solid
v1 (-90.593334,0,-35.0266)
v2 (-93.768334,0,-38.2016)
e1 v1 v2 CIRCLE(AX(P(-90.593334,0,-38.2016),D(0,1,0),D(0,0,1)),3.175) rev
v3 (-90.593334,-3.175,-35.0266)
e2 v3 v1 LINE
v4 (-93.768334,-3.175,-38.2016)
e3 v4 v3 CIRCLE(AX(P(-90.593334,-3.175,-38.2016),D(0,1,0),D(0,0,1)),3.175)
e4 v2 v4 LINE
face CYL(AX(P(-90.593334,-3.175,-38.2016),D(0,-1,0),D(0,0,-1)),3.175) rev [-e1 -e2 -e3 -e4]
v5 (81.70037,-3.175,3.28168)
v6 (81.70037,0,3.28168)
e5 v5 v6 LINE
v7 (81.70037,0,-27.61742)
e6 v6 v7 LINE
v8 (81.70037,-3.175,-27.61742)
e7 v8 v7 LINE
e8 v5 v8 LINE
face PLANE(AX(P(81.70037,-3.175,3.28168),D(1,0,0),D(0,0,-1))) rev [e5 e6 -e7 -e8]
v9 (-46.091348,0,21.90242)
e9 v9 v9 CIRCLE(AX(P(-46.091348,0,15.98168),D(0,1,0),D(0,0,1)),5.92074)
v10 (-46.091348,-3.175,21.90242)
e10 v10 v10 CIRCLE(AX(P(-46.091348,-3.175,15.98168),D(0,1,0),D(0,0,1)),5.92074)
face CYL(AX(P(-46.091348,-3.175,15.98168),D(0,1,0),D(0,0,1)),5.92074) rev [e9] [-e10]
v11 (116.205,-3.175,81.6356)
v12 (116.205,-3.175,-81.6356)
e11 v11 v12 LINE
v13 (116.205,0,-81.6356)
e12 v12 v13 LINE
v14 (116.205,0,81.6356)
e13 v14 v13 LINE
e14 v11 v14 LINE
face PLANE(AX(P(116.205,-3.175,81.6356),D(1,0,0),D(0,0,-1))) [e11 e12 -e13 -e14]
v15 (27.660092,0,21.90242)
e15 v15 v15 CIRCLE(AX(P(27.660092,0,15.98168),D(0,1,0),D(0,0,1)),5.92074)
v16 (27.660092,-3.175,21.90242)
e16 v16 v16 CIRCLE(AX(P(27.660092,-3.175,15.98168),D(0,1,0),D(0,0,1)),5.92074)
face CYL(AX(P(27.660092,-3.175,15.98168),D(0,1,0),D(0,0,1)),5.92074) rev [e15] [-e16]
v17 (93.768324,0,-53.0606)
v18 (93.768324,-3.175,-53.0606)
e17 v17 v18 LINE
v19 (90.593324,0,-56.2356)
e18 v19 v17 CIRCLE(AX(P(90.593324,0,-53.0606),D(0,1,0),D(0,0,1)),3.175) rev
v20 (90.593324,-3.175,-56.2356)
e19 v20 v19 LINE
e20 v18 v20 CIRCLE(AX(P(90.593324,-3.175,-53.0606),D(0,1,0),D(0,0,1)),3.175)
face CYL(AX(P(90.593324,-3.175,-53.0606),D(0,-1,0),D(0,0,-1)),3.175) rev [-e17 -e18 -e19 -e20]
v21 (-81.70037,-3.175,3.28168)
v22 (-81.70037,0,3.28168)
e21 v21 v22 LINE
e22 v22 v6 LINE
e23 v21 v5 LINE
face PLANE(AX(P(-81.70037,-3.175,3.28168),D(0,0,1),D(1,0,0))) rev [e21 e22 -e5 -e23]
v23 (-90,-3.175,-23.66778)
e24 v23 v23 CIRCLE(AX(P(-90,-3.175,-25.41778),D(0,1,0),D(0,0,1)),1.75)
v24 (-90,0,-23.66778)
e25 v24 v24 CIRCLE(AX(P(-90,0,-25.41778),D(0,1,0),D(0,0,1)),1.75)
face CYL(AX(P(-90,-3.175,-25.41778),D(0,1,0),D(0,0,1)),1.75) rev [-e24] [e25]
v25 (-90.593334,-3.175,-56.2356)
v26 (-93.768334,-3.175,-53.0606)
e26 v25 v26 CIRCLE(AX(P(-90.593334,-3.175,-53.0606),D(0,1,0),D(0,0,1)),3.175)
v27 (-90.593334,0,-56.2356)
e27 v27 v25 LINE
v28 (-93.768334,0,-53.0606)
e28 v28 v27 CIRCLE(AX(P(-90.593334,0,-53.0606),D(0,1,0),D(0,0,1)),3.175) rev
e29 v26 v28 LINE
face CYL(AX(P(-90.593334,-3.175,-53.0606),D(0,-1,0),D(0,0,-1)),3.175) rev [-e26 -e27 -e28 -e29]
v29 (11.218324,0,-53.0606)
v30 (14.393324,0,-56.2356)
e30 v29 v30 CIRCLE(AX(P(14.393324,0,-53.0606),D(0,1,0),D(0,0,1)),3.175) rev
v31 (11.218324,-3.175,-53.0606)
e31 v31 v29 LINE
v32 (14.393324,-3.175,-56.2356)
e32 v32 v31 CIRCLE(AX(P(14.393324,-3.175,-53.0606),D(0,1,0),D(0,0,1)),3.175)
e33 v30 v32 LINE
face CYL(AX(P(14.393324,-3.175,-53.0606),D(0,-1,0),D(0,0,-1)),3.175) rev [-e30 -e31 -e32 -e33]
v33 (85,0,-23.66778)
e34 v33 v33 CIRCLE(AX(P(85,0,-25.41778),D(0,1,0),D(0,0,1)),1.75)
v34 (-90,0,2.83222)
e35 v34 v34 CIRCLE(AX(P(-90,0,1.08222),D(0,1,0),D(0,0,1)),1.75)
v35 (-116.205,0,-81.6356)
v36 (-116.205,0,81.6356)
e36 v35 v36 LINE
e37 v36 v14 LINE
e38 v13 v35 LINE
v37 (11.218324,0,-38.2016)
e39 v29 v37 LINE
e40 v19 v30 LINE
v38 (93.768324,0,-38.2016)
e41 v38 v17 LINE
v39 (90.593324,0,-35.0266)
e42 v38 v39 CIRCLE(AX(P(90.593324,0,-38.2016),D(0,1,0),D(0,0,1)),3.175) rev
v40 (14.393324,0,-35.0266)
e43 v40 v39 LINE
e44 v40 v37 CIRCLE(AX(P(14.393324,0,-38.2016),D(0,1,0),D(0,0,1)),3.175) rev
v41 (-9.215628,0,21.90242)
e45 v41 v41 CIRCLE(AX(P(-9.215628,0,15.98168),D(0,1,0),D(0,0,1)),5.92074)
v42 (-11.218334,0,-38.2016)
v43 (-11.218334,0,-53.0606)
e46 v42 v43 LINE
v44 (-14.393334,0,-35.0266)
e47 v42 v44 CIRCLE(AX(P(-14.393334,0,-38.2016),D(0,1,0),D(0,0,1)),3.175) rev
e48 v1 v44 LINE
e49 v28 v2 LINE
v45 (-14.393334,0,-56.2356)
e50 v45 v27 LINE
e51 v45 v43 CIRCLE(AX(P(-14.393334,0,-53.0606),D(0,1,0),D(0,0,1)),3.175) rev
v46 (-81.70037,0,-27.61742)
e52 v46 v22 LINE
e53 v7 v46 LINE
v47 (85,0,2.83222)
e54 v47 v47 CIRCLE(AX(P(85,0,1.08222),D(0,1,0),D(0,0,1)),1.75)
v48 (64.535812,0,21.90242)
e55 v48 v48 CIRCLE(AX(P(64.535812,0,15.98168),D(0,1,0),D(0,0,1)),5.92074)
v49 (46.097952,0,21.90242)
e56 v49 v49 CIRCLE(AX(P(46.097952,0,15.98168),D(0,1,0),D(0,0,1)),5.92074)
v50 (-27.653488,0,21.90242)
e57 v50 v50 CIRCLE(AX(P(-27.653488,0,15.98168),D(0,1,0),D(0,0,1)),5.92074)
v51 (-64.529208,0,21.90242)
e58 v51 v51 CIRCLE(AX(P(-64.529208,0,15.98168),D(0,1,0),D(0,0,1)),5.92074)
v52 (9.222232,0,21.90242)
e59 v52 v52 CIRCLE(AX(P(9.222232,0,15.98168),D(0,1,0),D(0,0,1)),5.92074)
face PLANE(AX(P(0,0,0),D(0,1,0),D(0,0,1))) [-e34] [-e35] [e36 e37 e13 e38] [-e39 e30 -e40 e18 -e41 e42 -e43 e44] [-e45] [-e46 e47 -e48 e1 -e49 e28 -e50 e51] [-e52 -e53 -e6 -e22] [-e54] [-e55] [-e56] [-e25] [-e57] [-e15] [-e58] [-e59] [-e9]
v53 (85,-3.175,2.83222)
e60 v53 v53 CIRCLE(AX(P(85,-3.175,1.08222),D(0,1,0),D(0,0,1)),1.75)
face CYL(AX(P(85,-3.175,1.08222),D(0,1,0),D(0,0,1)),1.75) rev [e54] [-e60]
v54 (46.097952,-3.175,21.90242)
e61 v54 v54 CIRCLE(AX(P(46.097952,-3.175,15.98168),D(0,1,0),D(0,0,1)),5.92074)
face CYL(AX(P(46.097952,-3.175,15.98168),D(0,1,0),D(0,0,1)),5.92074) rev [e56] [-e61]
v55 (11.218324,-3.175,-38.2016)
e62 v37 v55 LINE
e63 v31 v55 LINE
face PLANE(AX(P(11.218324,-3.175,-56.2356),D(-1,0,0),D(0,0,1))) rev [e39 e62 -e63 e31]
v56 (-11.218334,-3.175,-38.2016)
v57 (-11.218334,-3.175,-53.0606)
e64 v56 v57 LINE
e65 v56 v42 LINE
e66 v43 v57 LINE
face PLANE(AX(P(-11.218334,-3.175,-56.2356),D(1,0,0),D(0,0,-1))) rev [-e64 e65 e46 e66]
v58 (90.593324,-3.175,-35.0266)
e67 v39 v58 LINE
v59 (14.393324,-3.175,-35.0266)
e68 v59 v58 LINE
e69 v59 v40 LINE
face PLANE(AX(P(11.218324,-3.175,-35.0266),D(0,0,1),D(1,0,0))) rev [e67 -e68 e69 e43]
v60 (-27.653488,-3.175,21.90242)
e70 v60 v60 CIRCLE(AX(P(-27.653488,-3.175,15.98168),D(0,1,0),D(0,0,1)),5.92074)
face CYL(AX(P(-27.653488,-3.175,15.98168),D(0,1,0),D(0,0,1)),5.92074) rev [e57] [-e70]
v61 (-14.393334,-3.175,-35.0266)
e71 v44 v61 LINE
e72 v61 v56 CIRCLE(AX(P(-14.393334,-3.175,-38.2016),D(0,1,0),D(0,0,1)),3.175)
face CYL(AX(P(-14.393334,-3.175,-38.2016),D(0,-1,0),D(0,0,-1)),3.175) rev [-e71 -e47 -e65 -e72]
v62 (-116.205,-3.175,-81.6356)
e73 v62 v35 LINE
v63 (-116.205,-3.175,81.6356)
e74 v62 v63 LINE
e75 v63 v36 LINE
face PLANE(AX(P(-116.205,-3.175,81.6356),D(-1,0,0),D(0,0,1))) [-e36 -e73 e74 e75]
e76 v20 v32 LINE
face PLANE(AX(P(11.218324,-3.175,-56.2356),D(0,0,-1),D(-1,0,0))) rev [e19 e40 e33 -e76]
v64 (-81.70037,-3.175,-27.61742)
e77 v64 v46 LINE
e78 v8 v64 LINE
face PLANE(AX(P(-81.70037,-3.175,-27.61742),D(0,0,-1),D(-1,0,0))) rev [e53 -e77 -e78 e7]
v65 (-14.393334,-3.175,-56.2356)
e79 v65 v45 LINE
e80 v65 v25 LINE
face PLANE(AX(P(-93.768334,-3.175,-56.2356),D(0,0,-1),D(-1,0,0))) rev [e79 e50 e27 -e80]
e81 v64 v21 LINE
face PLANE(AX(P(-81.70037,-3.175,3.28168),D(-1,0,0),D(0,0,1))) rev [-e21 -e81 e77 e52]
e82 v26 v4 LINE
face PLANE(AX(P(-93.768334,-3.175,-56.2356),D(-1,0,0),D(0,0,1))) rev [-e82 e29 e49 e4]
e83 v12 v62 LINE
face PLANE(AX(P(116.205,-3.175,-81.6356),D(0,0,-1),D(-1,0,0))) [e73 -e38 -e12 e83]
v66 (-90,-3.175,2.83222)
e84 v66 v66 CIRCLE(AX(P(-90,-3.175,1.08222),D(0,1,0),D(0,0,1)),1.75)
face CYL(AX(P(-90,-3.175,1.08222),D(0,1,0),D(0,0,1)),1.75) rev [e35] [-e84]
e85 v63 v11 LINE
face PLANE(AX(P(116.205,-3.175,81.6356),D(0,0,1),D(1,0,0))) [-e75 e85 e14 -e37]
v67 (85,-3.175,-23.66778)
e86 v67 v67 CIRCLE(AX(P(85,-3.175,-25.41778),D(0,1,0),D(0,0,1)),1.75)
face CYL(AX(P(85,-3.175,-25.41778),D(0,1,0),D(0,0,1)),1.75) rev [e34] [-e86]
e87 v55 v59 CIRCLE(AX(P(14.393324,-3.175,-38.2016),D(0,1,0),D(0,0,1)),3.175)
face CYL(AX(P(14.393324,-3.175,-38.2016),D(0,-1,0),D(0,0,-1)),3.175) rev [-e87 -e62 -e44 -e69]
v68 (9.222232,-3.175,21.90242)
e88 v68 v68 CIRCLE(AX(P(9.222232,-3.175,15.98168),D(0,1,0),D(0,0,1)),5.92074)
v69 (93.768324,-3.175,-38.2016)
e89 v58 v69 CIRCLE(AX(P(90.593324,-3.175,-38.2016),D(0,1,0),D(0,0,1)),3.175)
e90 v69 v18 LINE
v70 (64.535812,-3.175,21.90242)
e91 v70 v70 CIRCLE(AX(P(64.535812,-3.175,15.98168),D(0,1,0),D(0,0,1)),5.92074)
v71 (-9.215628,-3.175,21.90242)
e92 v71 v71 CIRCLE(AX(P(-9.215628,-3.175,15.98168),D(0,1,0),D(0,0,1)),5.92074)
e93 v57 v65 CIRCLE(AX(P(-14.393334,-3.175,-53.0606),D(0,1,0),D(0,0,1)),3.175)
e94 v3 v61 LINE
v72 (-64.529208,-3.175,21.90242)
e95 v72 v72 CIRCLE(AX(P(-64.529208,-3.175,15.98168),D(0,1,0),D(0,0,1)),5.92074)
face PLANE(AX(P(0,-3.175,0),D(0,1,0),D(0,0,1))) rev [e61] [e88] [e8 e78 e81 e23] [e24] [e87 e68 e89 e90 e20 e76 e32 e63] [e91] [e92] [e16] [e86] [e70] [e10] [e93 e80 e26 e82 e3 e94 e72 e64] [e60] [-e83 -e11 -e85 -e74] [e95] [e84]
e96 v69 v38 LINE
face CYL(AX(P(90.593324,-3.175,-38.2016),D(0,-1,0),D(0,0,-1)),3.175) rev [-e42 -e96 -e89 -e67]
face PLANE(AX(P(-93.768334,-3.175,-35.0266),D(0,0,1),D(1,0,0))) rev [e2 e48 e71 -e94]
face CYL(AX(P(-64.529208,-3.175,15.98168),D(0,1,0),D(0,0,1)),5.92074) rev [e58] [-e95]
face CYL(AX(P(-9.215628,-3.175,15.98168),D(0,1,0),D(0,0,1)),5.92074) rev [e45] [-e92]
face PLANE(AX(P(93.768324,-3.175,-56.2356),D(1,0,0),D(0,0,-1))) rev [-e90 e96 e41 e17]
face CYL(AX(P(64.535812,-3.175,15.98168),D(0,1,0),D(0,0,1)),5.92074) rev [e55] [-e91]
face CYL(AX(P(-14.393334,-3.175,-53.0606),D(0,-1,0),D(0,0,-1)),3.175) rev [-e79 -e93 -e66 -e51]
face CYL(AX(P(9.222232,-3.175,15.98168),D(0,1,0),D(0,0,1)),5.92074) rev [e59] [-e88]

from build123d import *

# Parameters (mm, degrees)
SKETCH1_W                = 232.41
SKETCH1_H                = 163.2712
BOSS_EXTRUDE1_DEPTH      = 3.175
SKETCH2_W                = 82.55
SKETCH2_H                = 21.209
CUT_EXTRUDE1_DEPTH       = 143.049476723
FILLET1_R                = 3.175
LPATTERN1_COUNT          = 2
LPATTERN1_PITCH          = 104.9866582
FILLET1_OF_LPATTERN1_R   = 3.175
CUT_EXTRUDE4_START       = -3.175
CUT_EXTRUDE4_OUTLINE_R   = 5.92074
CUT_EXTRUDE4_OUTLINE_W   = 163.40074
CUT_EXTRUDE4_OUTLINE_H   = 30.8991
CUT_EXTRUDE4_OUTLINE_R_2 = 1.75
CUT_EXTRUDE4_DEPTH       = 3.175


# Read off the part's stored shape, not the designer's step: Cut-Extrude4
with BuildPart() as part:
    # Sketch1 → Boss-Extrude1 (new body)
    with BuildSketch(Plane(origin=(0, 0, 0), x_dir=(1, 0, 0), z_dir=(0, 1, 0))):
        Rectangle(SKETCH1_W, SKETCH1_H)
    extrude(amount=-BOSS_EXTRUDE1_DEPTH)

    # Sketch2 → Cut-Extrude1 (cut, through all)
    with BuildSketch(Plane(origin=(0, 0, 0), x_dir=(1, 0, 0), z_dir=(0, 1, 0))):
        with Locations((-52.49333418, 45.6311)):
            Rectangle(SKETCH2_W, SKETCH2_H)
    cut_extrude1 = extrude(amount=-CUT_EXTRUDE1_DEPTH, mode=Mode.SUBTRACT)

    # Fillet1
    fillet1_edges = [part.edges().sort_by_distance(p)[0] for p in [
        (-93.76833418, -1.5875, -35.0266),
        (-93.76833418, -1.5875, -56.2356),
        (-11.21833418, -1.5875, -56.2356),
        (-11.21833418, -1.5875, -35.0266),
    ]]
    fillet(fillet1_edges, radius=FILLET1_R)

    # LPattern1: Cut-Extrude1 ×2
    with Locations(*[(i * LPATTERN1_PITCH, 0, 0) for i in range(1, LPATTERN1_COUNT)]):
        add(cut_extrude1, mode=Mode.SUBTRACT)

    # Fillet1 of LPattern1
    fillet1_of_lpattern1_edges = [part.edges().sort_by_distance(p)[0] for p in [
        (11.21832402, -1.5875, -35.0266),
        (11.21832402, -1.5875, -56.2356),
        (93.76832402, -1.5875, -56.2356),
        (93.76832402, -1.5875, -35.0266),
    ]]
    fillet(fillet1_of_lpattern1_edges, radius=FILLET1_OF_LPATTERN1_R)

    # Cut-Extrude4 outline → Cut-Extrude4 (cut)
    with BuildSketch(Plane(origin=(0, 0, 0), x_dir=(1, 0, 0), z_dir=(0, 1, 0)).offset(CUT_EXTRUDE4_START)):
        with Locations((-64.529208, -15.98168)):
            Circle(CUT_EXTRUDE4_OUTLINE_R)
        with Locations((-46.091348, -15.98168)):
            Circle(CUT_EXTRUDE4_OUTLINE_R)
        with Locations((-27.653488, -15.98168)):
            Circle(CUT_EXTRUDE4_OUTLINE_R)
        with Locations((-9.215628, -15.98168)):
            Circle(CUT_EXTRUDE4_OUTLINE_R)
        with Locations((9.222232, -15.98168)):
            Circle(CUT_EXTRUDE4_OUTLINE_R)
        with Locations((27.660092, -15.98168)):
            Circle(CUT_EXTRUDE4_OUTLINE_R)
        with Locations((46.097952, -15.98168)):
            Circle(CUT_EXTRUDE4_OUTLINE_R)
        with Locations((64.535812, -15.98168)):
            Circle(CUT_EXTRUDE4_OUTLINE_R)
        with Locations((0, 12.16787)):
            Rectangle(CUT_EXTRUDE4_OUTLINE_W, CUT_EXTRUDE4_OUTLINE_H)
        with Locations((-90, 25.41778)):
            Circle(CUT_EXTRUDE4_OUTLINE_R_2)
        with Locations((-90, -1.08222)):
            Circle(CUT_EXTRUDE4_OUTLINE_R_2)
        with Locations((85, -1.08222)):
            Circle(CUT_EXTRUDE4_OUTLINE_R_2)
        with Locations((85, 25.41778)):
            Circle(CUT_EXTRUDE4_OUTLINE_R_2)
    extrude(amount=CUT_EXTRUDE4_DEPTH, mode=Mode.SUBTRACT)


solid = part.part
